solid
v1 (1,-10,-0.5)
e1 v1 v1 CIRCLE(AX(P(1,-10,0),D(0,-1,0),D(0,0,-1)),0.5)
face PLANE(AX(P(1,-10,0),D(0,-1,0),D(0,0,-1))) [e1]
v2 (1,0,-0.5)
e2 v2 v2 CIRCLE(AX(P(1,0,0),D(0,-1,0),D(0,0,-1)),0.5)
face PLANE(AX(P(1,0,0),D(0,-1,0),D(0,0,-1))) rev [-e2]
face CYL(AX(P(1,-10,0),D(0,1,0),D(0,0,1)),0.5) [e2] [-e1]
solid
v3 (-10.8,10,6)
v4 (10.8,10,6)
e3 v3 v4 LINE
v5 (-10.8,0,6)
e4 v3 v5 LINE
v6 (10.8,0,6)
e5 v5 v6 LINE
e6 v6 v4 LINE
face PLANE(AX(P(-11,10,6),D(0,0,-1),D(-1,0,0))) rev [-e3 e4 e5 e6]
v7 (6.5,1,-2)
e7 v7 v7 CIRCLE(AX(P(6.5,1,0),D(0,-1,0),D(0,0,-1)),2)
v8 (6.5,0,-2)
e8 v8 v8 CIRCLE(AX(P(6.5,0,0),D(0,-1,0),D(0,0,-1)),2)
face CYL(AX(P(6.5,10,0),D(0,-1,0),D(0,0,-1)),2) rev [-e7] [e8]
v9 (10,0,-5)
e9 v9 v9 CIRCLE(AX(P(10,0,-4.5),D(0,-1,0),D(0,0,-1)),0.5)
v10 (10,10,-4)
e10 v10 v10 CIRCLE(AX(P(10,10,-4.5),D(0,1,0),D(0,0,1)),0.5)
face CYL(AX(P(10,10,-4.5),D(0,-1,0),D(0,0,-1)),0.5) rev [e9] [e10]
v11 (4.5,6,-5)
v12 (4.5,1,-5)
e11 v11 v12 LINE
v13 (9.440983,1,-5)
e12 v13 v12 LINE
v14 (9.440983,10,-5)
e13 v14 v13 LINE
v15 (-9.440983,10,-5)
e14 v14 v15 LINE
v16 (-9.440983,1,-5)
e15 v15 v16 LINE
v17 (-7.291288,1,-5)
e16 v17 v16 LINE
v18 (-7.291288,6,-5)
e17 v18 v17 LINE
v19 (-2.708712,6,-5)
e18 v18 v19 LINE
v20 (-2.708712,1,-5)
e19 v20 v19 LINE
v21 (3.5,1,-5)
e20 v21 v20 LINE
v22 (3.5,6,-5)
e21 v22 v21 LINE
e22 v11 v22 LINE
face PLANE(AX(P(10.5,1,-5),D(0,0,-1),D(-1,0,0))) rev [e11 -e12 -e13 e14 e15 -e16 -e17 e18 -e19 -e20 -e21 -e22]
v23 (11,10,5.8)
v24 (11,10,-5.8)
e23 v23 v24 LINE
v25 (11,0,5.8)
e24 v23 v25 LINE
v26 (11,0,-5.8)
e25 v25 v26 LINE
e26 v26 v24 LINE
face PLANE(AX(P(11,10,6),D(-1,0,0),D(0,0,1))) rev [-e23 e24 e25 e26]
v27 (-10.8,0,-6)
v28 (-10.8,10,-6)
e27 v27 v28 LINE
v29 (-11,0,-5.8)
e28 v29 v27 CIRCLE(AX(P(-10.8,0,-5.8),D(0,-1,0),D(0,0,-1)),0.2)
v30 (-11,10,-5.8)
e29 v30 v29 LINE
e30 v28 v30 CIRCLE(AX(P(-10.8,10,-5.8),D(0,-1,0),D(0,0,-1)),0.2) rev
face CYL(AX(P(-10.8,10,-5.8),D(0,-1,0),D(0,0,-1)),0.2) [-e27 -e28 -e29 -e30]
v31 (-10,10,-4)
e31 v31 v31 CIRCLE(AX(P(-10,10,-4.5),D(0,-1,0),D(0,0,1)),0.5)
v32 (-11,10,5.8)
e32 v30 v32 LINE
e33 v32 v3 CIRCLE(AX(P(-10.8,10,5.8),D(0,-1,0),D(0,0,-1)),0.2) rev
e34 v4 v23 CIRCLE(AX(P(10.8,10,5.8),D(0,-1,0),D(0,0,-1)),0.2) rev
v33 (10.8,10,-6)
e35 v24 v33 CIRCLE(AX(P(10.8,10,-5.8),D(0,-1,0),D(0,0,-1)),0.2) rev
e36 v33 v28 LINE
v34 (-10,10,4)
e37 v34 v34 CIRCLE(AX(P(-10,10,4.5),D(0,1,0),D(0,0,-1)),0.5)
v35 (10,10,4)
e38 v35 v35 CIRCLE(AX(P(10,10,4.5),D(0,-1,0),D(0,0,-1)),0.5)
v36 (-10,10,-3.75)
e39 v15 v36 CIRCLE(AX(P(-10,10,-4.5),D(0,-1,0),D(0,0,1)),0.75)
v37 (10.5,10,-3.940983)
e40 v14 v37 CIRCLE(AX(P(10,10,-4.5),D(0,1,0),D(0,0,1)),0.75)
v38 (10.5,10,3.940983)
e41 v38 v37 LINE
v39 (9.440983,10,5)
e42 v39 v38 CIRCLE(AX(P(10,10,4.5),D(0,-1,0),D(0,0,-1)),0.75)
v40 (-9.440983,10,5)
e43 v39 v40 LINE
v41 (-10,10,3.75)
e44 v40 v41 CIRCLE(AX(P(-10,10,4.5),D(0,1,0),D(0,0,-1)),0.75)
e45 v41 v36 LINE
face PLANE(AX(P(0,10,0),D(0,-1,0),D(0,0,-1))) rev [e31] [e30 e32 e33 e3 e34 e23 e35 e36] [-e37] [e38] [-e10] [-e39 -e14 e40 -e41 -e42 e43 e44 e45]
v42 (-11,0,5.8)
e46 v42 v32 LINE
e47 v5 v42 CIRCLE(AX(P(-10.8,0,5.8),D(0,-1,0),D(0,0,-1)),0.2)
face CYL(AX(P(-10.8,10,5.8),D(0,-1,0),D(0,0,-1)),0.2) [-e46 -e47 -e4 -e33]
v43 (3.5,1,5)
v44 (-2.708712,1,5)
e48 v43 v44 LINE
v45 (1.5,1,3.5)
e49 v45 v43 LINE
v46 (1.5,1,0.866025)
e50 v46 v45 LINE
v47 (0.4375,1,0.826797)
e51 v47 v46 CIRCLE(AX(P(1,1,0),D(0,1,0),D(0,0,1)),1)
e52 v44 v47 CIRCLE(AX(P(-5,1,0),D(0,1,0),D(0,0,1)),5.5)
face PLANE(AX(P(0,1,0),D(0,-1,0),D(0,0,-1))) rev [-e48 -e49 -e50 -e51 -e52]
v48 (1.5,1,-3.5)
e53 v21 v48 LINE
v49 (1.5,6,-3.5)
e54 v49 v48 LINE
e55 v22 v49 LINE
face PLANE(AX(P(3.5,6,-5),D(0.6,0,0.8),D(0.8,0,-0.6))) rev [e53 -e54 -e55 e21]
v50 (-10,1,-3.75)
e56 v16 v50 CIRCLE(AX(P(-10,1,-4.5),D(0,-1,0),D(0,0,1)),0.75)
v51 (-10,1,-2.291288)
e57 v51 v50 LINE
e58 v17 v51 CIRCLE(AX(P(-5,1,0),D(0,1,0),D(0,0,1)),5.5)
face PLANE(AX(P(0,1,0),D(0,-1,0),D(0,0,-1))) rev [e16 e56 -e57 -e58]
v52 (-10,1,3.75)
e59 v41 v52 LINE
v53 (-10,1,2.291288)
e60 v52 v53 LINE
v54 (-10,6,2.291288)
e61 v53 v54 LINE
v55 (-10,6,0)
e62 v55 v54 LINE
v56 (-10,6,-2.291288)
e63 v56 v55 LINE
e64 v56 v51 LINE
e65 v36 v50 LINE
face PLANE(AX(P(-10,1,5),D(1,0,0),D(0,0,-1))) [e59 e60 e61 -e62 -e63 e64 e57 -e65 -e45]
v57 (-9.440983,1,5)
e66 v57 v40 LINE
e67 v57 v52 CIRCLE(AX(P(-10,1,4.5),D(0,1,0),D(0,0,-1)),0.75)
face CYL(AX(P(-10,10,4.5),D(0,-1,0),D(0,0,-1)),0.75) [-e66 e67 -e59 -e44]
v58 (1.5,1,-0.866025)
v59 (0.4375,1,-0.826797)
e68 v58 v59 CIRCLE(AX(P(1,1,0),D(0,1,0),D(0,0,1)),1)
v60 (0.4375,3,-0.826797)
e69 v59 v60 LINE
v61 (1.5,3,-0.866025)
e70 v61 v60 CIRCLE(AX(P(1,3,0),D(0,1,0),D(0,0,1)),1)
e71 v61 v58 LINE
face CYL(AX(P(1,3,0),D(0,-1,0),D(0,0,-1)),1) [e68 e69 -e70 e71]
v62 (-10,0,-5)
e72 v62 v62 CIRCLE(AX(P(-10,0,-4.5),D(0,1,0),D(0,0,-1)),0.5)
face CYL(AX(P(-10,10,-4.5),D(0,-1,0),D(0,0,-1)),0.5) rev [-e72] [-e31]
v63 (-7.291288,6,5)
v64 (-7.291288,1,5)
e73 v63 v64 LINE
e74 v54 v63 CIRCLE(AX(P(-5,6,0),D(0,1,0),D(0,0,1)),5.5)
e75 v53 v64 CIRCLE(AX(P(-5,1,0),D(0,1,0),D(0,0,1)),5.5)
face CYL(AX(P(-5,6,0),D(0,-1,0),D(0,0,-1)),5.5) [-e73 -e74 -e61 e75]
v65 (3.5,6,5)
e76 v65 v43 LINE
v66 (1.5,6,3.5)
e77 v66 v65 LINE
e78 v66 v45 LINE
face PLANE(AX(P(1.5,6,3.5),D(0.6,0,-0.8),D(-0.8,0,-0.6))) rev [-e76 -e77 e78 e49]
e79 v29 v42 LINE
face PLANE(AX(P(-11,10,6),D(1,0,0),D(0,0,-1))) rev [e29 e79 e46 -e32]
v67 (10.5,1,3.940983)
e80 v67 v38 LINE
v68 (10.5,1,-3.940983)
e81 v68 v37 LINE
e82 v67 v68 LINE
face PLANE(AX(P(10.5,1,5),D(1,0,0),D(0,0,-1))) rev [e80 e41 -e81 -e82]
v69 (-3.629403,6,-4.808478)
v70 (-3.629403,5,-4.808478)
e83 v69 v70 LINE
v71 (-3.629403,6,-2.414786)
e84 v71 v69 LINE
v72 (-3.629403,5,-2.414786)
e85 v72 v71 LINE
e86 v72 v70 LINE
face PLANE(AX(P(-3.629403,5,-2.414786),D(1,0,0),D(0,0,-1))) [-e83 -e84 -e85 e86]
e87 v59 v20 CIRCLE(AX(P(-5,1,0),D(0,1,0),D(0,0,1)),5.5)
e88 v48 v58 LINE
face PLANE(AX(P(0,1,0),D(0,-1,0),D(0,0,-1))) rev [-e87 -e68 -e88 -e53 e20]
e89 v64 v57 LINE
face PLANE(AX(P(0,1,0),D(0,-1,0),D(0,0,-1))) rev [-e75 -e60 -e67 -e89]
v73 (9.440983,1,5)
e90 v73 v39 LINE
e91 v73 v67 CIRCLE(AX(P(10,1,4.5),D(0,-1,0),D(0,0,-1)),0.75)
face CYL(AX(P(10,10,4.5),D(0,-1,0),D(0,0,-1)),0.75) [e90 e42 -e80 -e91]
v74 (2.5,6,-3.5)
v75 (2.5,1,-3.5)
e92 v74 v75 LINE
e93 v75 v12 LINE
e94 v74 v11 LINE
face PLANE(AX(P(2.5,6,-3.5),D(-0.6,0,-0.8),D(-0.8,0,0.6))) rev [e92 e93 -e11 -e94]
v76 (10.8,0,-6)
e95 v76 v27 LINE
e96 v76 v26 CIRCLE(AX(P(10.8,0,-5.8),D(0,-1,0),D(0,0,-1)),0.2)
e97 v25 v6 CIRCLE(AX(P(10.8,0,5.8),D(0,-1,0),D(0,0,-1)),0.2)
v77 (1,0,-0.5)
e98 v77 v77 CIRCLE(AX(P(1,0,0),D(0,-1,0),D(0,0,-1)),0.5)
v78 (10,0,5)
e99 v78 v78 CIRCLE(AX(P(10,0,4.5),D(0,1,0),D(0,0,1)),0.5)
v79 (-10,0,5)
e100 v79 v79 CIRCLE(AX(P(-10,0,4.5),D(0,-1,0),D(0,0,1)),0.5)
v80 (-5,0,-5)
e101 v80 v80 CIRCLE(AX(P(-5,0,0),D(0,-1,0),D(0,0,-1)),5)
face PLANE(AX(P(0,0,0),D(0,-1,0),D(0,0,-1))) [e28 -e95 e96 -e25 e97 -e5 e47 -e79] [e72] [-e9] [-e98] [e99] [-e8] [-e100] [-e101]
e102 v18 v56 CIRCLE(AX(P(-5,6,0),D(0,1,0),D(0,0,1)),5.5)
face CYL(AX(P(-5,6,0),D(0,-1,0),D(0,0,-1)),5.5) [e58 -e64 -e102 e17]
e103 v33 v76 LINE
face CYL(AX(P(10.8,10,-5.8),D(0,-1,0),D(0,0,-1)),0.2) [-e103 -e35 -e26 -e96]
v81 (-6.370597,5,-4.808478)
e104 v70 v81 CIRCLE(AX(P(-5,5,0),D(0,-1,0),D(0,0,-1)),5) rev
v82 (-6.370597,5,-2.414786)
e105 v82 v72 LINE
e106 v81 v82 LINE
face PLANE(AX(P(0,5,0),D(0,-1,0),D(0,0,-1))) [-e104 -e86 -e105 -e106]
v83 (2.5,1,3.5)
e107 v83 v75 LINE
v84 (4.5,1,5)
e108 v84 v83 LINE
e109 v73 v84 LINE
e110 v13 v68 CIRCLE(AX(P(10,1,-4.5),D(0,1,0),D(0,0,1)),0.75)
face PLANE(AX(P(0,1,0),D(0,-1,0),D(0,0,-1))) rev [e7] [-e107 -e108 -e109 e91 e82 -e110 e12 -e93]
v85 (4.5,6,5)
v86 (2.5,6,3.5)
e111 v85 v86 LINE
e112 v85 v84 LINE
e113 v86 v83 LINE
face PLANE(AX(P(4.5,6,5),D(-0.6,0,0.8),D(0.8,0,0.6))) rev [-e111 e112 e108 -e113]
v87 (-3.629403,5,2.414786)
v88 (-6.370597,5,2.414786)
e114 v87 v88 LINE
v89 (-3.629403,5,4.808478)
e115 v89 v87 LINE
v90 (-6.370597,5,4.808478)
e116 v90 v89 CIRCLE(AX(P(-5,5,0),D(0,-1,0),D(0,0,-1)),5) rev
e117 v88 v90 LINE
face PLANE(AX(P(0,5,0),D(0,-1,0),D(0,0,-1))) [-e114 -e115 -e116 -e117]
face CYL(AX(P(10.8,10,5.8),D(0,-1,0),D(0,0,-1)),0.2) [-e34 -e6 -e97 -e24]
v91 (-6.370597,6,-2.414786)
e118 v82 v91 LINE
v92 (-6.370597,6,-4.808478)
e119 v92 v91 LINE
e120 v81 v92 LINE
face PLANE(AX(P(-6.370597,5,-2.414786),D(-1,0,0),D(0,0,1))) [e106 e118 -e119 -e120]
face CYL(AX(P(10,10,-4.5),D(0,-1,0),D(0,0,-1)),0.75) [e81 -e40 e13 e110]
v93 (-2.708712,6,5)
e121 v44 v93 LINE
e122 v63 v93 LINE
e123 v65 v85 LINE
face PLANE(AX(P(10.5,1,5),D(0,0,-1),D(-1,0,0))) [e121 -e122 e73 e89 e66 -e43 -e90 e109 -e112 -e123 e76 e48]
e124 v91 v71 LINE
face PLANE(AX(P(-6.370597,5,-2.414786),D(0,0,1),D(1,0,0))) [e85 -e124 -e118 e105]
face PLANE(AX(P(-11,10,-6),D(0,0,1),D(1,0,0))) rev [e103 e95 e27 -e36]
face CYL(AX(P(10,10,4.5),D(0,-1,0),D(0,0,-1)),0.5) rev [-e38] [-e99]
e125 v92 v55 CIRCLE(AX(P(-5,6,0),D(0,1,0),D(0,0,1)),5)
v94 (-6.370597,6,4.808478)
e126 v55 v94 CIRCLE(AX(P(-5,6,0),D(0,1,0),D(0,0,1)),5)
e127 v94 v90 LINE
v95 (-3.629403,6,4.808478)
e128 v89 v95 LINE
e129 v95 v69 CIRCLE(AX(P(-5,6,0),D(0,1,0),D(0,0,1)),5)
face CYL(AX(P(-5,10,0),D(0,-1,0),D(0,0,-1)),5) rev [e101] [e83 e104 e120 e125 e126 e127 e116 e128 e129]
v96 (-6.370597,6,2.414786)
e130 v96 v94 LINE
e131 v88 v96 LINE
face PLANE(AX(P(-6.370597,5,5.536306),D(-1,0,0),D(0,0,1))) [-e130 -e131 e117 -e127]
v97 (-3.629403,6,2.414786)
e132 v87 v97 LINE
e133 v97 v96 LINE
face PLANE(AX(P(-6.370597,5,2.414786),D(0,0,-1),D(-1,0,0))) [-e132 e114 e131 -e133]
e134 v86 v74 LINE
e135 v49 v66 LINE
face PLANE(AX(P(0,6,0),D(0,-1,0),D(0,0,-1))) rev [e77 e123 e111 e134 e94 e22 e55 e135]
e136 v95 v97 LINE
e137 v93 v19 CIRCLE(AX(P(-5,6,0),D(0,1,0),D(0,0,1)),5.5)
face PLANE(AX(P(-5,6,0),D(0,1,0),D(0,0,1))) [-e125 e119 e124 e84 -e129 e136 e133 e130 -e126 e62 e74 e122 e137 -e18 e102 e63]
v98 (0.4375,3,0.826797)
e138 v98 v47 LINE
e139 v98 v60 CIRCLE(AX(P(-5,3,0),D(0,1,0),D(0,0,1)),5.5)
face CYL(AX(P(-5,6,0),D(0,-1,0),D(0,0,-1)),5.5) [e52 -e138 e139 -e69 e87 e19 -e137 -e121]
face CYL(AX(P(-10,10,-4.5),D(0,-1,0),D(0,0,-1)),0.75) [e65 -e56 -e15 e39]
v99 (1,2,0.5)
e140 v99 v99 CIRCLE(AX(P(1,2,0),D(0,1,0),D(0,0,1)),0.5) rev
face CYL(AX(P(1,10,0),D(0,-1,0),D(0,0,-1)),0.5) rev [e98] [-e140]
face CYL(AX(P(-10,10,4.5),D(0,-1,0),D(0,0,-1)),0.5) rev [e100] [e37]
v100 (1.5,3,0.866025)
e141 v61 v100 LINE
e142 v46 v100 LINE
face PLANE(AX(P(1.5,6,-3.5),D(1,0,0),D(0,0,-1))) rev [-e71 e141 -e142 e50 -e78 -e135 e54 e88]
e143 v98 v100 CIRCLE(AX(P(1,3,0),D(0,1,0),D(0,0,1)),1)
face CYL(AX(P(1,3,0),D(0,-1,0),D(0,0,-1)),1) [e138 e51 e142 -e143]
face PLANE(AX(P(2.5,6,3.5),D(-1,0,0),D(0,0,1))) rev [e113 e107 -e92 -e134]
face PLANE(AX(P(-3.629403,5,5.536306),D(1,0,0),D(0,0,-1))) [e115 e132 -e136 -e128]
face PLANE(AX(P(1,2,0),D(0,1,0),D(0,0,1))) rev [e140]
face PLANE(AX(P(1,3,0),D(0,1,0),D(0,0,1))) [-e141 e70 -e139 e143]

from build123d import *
from build123d.topology import SkipClean

# Parameters (mm, degrees)
SKETCH1_W                 = 22
SKETCH1_H                 = 12
BOSS_EXTRUDE1_DEPTH       = 10
SKETCH2_W                 = 20.5
SKETCH2_H                 = 10
CUT_EXTRUDE1_DEPTH        = 9
FILLET1_R                 = 0.2
SKETCH3_R                 = 5
CUT_EXTRUDE2_DEPTH        = 17.031219542
SKETCH4_R                 = 0.5
CUT_EXTRUDE3_DEPTH        = 17.031219542
SKETCH5_R                 = 2
CUT_EXTRUDE4_DEPTH        = 17.031219542
BOSS_EXTRUDE2_DEPTH       = 5
SKETCH9_R                 = 5.5
SKETCH9_R_2               = 5
BOSS_EXTRUDE3_DEPTH       = 5
SKETCH10_R                = 1
SKETCH10_R_2              = 0.5
BOSS_EXTRUDE4_DEPTH       = 2
BOSS_EXTRUDE6_START       = -1
SKETCH12_R                = 0.5
BOSS_EXTRUDE6_DEPTH       = 1
SKETCH13_R                = 0.75
SKETCH13_R_2              = 0.5
BOSS_EXTRUDE7_DEPTH       = 9
SKETCH14_R                = 0.5
CUT_EXTRUDE5_DEPTH        = 17.031219542
MIRROR2_COPY_1_SKETCH_R   = 0.75
MIRROR2_COPY_1_SKETCH_R_2 = 0.5
MIRROR2_COPY_1_DEPTH      = 9
MIRROR2_COPY_2_SKETCH_R   = 0.5
MIRROR2_COPY_2_DEPTH      = 17.031219542
MIRROR2_COPY_3_SKETCH_R   = 0.75
MIRROR2_COPY_3_SKETCH_R_2 = 0.5
MIRROR2_COPY_3_DEPTH      = 9
MIRROR2_COPY_4_SKETCH_R   = 0.5
MIRROR2_COPY_4_DEPTH      = 17.031219542
SKETCH15_W                = 2.741193842
SKETCH15_H                = 3.121519946
BOSS_EXTRUDE8_DEPTH       = 1
SKETCH16_R                = 0.5
BOSS_EXTRUDE9_DEPTH       = 10


with BuildPart() as part:
    # Sketch1 → Boss-Extrude1 (new body)
    with BuildSketch(Plane(origin=(0, 0, 0), x_dir=(1, 0, 0), z_dir=(0, 1, 0))):
        Rectangle(SKETCH1_W, SKETCH1_H)
    extrude(amount=BOSS_EXTRUDE1_DEPTH)

    # Sketch2 → Cut-Extrude1 (cut)
    with BuildSketch(Plane(origin=(0, 10, 0), x_dir=(1, 0, 0), z_dir=(0, 1, 0))):
        with Locations((0.25, 0)):
            Rectangle(SKETCH2_W, SKETCH2_H)
    extrude(amount=-CUT_EXTRUDE1_DEPTH, mode=Mode.SUBTRACT)

    # Fillet1
    fillet1_edges = [part.edges().sort_by_distance(p)[0] for p in [
        (-11, 5, -6),
        (11, 5, -6),
        (11, 5, 6),
        (-11, 5, 6),
    ]]
    fillet(fillet1_edges, radius=FILLET1_R)

    # Sketch3 → Cut-Extrude2 (cut, through all)
    with BuildSketch(Plane(origin=(0, 0, 0), x_dir=(-1, 0, 0), z_dir=(0, -1, 0))):
        with Locations((5, 0)):
            Circle(SKETCH3_R)
    extrude(amount=-CUT_EXTRUDE2_DEPTH, mode=Mode.SUBTRACT)

    # Sketch4 → Cut-Extrude3 (cut, through all)
    with BuildSketch(Plane(origin=(0, 0, 0), x_dir=(-1, 0, 0), z_dir=(0, -1, 0))):
        with Locations((-1, 0)):
            Circle(SKETCH4_R)
    extrude(amount=-CUT_EXTRUDE3_DEPTH, mode=Mode.SUBTRACT)

    # Sketch5 → Cut-Extrude4 (cut, through all)
    with BuildSketch(Plane(origin=(0, 0, 0), x_dir=(-1, 0, 0), z_dir=(0, -1, 0))):
        with Locations((-6.5, 0)):
            Circle(SKETCH5_R)
    extrude(amount=-CUT_EXTRUDE4_DEPTH, mode=Mode.SUBTRACT)

    # Sketch6 → Boss-Extrude2 (add)
    with BuildSketch(Plane(origin=(0, 1, 0), x_dir=(1, 0, 0), z_dir=(0, 1, 0))):
        Polygon((2.5, -3.5), (2.5, 3.5), (4.5, 5), (3.5, 5), (1.5, 3.5), (1.5, -3.5), (3.5, -5), (4.5, -5), align=None)
    extrude(amount=BOSS_EXTRUDE2_DEPTH)

    # Sketch9 → Boss-Extrude3 (add)
    with SkipClean():  # the faces are left unmerged after this step: merging them gives an invalid solid
        with BuildSketch(Plane(origin=(0, 1, 0), x_dir=(1, 0, 0), z_dir=(0, 1, 0))):
            with Locations((-5, 0)):
                Circle(SKETCH9_R)
            with Locations((-5, 0)):
                Circle(SKETCH9_R_2, mode=Mode.SUBTRACT)
        extrude(amount=BOSS_EXTRUDE3_DEPTH)

    # Sketch10 → Boss-Extrude4 (add)
    with SkipClean():  # the faces are left unmerged after this step: merging them gives an invalid solid
        with BuildSketch(Plane(origin=(0, 1, 0), x_dir=(1, 0, 0), z_dir=(0, 1, 0))):
            with Locations((1, 0)):
                Circle(SKETCH10_R)
            with Locations((1, 0)):
                Circle(SKETCH10_R_2, mode=Mode.SUBTRACT)
        extrude(amount=BOSS_EXTRUDE4_DEPTH)

    # Sketch12 → Boss-Extrude6 (add)
    with SkipClean():  # the faces are left unmerged after this step: merging them gives an invalid solid
        with BuildSketch(Plane(origin=(0, 3, 0), x_dir=(1, 0, 0), z_dir=(0, 1, 0)).offset(BOSS_EXTRUDE6_START)):
            with Locations((1, 0)):
                Circle(SKETCH12_R)
        extrude(amount=BOSS_EXTRUDE6_DEPTH)

    # Sketch13 → Boss-Extrude7 (add)
    with SkipClean():  # the faces are left unmerged after this step: merging them gives an invalid solid
        with BuildSketch(Plane(origin=(0, 1, 0), x_dir=(1, 0, 0), z_dir=(0, 1, 0))):
            with Locations((10, 4.5)):
                Circle(SKETCH13_R)
            with Locations((10, 4.5)):
                Circle(SKETCH13_R_2, mode=Mode.SUBTRACT)
        boss_extrude7 = extrude(amount=BOSS_EXTRUDE7_DEPTH)

    # Sketch14 → Cut-Extrude5 (cut, through all)
    with SkipClean():  # the faces are left unmerged after this step: merging them gives an invalid solid
        with BuildSketch(Plane(origin=(0, 0, 0), x_dir=(-1, 0, 0), z_dir=(0, -1, 0))):
            with Locations((-10, 4.5)):
                Circle(SKETCH14_R)
        cut_extrude5 = extrude(amount=-CUT_EXTRUDE5_DEPTH, mode=Mode.SUBTRACT)

    # Mirror1: Boss-Extrude7, Cut-Extrude5 across plane
    with SkipClean():  # the faces are left unmerged after this step: merging them gives an invalid solid
        add(boss_extrude7.mirror(Plane(origin=(0, 0, 0), x_dir=(0, 0, 1), z_dir=(1, 0, 0))))
        add(cut_extrude5.mirror(Plane(origin=(0, 0, 0), x_dir=(0, 0, 1), z_dir=(1, 0, 0))), mode=Mode.SUBTRACT)

    # Mirror2 copy 1 sketch → Mirror2 copy 1 (add)
    with SkipClean():  # the faces are left unmerged after this step: merging them gives an invalid solid
        with BuildSketch(Plane(origin=(0, 1, 0), x_dir=(-1, 0, 0), z_dir=(0, 1, 0))):
            with Locations((10, 4.5)):
                Circle(MIRROR2_COPY_1_SKETCH_R)
            with Locations((10, 4.5)):
                Circle(MIRROR2_COPY_1_SKETCH_R_2, mode=Mode.SUBTRACT)
        extrude(amount=MIRROR2_COPY_1_DEPTH)

    # Mirror2 copy 2 sketch → Mirror2 copy 2 (cut, through all)
    with SkipClean():  # the faces are left unmerged after this step: merging them gives an invalid solid
        with BuildSketch(Plane.XZ):
            with Locations((-10, 4.5)):
                Circle(MIRROR2_COPY_2_SKETCH_R)
        extrude(amount=-MIRROR2_COPY_2_DEPTH, mode=Mode.SUBTRACT)

    # Mirror2 copy 3 sketch → Mirror2 copy 3 (add)
    with SkipClean():  # the faces are left unmerged after this step: merging them gives an invalid solid
        with BuildSketch(Plane(origin=(0, 1, 0), x_dir=(1, 0, 0), z_dir=(0, 1, 0))):
            with Locations((10, -4.5)):
                Circle(MIRROR2_COPY_3_SKETCH_R)
            with Locations((10, -4.5)):
                Circle(MIRROR2_COPY_3_SKETCH_R_2, mode=Mode.SUBTRACT)
        extrude(amount=MIRROR2_COPY_3_DEPTH)

    # Mirror2 copy 4 sketch → Mirror2 copy 4 (cut, through all)
    with SkipClean():  # the faces are left unmerged after this step: merging them gives an invalid solid
        with BuildSketch(Plane(origin=(0, 0, 0), x_dir=(-1, 0, 0), z_dir=(0, -1, 0))):
            with Locations((-10, -4.5)):
                Circle(MIRROR2_COPY_4_SKETCH_R)
        extrude(amount=-MIRROR2_COPY_4_DEPTH, mode=Mode.SUBTRACT)

    # Sketch15 → Boss-Extrude8 (add)
    with SkipClean():  # the faces are left unmerged after this step: merging them gives an invalid solid
        with BuildSketch(Plane(origin=(0, 6, 0), x_dir=(1, 0, 0), z_dir=(0, 1, 0))):
            with Locations((-5, 3.975545746)):
                Rectangle(SKETCH15_W, SKETCH15_H)
            with Locations((-5, -3.975545746)):
                Rectangle(SKETCH15_W, SKETCH15_H)
        extrude(amount=-BOSS_EXTRUDE8_DEPTH)


with BuildPart() as body_2:
    # Sketch16 → Boss-Extrude9 (new body)
    with BuildSketch(Plane.XZ):
        with Locations((1, 0)):
            Circle(SKETCH16_R)
    extrude(amount=BOSS_EXTRUDE9_DEPTH)


solid = Compound([part.part, body_2.part])
